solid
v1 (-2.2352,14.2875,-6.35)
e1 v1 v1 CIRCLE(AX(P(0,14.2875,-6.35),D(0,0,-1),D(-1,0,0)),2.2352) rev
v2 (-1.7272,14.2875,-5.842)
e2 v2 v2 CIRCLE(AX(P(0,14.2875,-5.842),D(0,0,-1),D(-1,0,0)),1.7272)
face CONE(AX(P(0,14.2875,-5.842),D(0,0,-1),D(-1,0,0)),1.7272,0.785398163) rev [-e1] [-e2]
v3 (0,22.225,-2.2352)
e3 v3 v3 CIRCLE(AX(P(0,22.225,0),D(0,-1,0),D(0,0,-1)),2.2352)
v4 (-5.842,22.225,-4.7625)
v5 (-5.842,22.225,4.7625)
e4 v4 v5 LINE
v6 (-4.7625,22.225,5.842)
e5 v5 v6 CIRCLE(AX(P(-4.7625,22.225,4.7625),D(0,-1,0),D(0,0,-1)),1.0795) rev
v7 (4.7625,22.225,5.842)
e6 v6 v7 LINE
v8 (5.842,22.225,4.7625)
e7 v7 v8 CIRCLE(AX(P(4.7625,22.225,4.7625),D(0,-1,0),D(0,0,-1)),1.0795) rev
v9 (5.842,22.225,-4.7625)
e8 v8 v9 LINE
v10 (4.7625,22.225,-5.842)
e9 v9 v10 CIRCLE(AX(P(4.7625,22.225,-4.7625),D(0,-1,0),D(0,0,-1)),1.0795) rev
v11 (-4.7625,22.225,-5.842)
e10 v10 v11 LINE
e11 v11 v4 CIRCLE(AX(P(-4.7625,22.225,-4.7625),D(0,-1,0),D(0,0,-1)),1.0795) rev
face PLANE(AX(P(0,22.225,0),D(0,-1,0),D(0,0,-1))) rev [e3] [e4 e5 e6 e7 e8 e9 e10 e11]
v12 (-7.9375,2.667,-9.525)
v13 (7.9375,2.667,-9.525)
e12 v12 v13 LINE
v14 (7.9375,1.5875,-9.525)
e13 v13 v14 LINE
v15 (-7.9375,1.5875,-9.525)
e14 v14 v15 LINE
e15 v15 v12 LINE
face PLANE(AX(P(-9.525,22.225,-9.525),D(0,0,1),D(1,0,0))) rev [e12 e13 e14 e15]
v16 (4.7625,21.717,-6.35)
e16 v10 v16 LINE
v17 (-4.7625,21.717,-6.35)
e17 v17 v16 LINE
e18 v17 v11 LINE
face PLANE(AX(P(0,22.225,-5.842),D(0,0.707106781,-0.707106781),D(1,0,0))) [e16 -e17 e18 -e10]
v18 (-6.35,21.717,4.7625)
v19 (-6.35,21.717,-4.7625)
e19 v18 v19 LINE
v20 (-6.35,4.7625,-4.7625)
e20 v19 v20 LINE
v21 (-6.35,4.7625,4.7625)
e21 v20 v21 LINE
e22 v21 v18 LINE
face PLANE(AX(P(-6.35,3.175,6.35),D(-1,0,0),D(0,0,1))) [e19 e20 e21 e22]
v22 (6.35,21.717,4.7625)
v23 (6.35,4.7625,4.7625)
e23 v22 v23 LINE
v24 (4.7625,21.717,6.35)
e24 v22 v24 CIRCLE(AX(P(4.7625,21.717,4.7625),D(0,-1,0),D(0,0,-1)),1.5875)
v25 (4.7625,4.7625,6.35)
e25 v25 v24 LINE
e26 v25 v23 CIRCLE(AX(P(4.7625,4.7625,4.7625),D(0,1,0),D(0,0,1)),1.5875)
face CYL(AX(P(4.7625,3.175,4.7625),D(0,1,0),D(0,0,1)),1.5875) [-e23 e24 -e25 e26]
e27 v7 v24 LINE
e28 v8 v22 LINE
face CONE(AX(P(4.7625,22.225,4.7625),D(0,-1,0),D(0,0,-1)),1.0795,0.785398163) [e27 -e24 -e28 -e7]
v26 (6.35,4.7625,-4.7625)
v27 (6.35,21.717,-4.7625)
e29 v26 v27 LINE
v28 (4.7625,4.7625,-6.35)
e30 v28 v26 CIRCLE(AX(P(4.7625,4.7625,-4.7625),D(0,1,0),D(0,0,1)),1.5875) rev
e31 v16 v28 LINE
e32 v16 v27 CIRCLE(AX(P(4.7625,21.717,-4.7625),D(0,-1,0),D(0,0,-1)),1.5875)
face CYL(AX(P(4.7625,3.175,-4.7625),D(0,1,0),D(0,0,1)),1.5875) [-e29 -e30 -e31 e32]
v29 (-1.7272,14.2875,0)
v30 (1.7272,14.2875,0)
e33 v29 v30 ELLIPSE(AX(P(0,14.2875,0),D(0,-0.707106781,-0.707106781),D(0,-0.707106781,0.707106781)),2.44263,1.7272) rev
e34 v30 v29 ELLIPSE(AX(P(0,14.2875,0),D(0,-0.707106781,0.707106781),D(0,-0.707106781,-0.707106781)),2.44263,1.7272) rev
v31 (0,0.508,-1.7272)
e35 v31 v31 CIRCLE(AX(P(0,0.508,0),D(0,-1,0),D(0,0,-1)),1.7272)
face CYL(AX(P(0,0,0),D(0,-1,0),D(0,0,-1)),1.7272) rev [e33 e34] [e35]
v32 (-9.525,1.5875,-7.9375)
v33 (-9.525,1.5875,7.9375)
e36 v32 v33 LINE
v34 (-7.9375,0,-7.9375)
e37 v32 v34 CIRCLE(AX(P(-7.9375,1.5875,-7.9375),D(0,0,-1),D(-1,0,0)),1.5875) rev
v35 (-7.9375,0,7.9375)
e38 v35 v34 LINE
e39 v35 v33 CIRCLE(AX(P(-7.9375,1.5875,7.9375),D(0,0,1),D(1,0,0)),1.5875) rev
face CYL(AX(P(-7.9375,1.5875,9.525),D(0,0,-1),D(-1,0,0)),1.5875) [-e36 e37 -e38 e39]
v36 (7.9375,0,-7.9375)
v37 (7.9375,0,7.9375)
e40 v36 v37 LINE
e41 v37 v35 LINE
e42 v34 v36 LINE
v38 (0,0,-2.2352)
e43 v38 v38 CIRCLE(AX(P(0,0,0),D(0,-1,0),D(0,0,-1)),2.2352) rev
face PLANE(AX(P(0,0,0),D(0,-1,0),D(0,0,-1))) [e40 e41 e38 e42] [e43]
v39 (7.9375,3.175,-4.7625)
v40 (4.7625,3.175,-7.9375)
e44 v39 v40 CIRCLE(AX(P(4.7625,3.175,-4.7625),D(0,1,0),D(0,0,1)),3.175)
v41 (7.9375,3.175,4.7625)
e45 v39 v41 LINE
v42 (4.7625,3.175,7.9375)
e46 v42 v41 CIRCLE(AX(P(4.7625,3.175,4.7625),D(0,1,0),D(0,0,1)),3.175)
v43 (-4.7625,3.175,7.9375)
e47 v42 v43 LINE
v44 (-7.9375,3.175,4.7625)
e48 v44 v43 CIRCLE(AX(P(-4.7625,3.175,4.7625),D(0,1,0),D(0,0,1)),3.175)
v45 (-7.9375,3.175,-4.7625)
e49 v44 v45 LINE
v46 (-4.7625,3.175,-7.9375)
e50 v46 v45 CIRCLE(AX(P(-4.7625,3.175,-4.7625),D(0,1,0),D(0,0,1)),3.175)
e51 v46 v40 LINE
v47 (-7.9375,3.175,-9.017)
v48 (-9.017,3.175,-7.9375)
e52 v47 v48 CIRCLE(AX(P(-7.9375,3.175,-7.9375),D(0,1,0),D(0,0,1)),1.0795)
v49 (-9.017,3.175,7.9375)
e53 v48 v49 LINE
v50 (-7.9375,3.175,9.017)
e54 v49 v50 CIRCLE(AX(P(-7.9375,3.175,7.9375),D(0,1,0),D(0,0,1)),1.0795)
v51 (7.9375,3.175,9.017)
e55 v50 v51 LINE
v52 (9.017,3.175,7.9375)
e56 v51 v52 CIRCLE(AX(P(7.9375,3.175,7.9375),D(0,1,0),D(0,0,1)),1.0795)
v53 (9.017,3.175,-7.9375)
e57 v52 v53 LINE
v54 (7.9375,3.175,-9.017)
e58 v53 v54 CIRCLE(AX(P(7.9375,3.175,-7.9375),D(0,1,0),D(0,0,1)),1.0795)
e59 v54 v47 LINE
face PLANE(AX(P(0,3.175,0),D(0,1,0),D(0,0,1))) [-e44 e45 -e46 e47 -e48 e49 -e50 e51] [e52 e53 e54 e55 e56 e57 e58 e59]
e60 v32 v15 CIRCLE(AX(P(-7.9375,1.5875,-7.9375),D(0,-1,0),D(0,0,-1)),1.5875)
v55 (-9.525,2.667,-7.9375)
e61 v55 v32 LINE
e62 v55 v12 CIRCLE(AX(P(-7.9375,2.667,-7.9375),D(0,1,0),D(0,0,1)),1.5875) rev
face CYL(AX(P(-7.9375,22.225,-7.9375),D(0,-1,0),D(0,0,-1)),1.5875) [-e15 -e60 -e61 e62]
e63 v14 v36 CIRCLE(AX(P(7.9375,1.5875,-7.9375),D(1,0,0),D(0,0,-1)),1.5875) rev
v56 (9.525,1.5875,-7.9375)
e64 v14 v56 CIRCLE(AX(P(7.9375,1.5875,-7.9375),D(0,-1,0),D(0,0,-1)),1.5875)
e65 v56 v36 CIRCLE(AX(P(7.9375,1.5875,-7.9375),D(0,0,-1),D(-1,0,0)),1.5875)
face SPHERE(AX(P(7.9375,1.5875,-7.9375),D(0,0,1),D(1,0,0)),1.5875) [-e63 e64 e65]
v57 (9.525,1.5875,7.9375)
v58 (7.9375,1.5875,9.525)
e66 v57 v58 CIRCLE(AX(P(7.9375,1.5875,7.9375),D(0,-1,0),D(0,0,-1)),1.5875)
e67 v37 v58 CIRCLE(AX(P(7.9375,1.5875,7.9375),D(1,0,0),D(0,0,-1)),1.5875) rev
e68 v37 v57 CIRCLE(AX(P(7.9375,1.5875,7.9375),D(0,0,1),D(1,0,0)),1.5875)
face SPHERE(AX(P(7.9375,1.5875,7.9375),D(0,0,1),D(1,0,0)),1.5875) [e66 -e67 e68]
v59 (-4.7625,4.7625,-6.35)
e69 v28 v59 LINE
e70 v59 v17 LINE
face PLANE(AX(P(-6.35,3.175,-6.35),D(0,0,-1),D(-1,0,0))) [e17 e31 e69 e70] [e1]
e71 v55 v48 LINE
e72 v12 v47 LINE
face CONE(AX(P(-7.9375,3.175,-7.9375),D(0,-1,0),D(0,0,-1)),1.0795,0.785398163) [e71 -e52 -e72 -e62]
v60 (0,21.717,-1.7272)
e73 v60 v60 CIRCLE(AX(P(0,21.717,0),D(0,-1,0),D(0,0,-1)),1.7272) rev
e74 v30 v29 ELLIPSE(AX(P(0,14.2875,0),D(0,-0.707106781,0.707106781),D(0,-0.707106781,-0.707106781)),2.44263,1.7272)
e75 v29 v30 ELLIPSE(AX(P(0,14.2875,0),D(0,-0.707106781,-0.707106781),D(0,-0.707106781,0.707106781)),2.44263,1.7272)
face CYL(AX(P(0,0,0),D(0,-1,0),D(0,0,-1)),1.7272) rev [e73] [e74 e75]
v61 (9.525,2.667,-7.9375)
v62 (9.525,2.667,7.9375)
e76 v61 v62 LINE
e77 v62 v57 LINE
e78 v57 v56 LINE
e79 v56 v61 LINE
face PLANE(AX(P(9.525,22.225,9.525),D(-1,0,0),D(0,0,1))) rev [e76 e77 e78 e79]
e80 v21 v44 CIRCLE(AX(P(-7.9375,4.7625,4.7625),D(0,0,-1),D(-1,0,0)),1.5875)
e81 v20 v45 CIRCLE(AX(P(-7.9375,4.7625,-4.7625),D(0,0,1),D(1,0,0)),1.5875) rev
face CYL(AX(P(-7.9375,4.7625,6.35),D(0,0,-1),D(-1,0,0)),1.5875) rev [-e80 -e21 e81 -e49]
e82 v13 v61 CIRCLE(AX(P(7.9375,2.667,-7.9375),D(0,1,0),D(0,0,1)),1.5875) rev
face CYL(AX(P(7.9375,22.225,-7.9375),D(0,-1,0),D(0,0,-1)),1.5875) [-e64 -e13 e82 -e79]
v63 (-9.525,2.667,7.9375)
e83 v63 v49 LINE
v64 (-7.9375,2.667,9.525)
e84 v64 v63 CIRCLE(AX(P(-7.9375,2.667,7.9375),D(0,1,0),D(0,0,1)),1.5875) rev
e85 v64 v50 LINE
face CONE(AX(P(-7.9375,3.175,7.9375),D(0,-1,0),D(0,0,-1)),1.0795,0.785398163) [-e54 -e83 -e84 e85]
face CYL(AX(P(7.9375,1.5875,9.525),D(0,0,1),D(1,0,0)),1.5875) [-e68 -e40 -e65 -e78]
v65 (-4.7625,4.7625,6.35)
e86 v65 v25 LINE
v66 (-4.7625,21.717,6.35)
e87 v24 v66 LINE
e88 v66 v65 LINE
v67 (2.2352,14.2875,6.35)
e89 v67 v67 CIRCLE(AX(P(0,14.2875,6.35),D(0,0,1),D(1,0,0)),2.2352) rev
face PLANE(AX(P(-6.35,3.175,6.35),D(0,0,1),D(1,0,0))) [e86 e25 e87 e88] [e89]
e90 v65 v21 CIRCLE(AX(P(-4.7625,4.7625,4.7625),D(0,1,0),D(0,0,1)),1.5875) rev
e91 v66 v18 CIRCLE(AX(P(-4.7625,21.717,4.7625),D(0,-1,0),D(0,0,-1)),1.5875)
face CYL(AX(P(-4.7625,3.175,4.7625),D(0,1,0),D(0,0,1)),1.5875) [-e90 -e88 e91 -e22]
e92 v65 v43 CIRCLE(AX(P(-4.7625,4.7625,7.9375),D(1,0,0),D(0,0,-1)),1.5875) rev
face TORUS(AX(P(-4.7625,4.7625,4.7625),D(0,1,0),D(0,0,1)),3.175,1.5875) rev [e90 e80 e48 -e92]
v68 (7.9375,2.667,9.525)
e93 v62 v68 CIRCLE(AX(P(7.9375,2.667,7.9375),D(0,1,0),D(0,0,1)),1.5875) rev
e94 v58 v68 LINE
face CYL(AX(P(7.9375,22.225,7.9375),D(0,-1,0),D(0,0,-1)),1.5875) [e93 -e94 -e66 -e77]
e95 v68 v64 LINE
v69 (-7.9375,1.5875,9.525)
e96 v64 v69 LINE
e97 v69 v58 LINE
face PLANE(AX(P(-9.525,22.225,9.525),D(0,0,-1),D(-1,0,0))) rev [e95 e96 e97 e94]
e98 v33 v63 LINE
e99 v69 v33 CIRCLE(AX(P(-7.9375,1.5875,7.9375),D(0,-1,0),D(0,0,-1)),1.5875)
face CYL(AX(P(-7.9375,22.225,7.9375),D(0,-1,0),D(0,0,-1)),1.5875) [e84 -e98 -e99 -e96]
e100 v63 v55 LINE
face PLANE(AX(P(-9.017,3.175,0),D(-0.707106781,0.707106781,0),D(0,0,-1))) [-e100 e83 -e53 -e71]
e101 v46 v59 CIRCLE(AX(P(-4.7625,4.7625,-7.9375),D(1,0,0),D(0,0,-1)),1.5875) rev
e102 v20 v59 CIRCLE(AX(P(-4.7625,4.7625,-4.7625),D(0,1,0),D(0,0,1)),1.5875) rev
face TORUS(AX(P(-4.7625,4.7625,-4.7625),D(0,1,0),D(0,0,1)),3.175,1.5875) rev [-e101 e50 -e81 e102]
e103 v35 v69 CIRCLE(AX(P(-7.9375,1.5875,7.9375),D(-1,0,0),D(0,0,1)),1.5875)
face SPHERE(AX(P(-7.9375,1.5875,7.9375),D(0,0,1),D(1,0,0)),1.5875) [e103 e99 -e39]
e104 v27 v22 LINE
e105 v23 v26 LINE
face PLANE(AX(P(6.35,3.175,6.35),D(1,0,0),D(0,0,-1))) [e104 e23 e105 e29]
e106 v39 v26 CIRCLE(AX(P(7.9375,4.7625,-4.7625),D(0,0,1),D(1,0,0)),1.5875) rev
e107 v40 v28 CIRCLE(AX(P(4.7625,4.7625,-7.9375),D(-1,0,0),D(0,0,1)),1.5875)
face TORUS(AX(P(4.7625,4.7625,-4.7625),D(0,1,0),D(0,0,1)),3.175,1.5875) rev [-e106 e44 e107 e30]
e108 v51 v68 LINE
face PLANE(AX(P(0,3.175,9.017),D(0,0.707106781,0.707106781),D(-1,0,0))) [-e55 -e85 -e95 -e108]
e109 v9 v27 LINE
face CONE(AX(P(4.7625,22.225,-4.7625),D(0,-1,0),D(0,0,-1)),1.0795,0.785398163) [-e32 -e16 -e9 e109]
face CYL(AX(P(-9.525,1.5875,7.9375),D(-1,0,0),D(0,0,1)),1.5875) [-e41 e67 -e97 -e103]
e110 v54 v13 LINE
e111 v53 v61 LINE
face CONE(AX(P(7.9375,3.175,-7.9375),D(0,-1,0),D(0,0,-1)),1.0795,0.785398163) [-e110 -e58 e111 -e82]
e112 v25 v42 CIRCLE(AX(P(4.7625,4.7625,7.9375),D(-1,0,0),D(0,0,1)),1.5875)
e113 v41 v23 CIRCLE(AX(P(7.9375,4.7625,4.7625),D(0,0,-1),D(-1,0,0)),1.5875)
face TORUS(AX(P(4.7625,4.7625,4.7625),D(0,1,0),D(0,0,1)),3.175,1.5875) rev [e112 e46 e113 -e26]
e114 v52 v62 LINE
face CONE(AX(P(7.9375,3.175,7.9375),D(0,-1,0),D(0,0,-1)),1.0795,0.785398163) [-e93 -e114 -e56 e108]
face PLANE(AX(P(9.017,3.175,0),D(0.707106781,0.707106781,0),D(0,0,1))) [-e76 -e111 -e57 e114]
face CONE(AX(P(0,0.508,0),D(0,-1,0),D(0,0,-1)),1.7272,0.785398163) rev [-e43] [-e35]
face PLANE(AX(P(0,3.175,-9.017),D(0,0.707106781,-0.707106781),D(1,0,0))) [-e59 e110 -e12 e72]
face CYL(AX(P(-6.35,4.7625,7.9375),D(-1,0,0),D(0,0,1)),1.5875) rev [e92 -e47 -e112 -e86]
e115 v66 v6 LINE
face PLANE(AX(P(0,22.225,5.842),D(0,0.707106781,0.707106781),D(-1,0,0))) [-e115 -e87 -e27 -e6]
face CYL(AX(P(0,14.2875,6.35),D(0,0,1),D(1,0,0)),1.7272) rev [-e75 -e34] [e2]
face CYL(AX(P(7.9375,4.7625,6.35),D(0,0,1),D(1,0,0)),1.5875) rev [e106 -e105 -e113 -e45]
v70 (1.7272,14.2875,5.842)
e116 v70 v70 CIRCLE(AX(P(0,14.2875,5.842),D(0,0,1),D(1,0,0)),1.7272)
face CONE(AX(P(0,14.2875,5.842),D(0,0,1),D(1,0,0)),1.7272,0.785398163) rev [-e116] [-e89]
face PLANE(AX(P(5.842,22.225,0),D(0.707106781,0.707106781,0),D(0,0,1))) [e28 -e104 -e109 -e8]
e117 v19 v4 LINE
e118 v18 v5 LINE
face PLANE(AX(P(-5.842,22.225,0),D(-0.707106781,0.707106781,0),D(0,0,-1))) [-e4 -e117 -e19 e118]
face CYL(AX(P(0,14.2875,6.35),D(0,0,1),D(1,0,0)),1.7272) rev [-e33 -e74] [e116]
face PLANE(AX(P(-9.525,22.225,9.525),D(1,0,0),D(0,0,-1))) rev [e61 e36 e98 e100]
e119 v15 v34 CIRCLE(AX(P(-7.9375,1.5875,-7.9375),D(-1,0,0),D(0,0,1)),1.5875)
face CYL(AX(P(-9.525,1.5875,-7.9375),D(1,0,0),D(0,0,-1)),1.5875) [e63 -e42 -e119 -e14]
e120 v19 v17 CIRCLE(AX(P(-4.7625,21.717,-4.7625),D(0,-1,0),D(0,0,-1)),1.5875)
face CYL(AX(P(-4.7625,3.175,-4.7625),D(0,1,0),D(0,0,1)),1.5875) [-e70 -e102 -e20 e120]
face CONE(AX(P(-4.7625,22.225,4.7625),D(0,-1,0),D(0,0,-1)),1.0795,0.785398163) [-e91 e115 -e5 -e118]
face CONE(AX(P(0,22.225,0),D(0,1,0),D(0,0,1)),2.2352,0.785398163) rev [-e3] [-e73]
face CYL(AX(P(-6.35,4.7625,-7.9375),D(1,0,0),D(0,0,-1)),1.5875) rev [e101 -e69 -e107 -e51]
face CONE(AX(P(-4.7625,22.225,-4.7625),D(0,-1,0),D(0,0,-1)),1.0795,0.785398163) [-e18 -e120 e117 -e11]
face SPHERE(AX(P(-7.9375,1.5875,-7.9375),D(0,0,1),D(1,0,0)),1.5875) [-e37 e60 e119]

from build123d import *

# Parameters (mm, degrees)
SKETCH1_W             = 19.05
SKETCH1_H             = 19.05
BOSS_EXTRUDE1_DEPTH   = 22.225
SKETCH2_OUTSIDE_W     = 28.034
SKETCH2_OUTSIDE_H     = 28.034
SKETCH2_OUTSIDE_W_2   = 12.7
SKETCH2_OUTSIDE_H_2   = 12.7
CUT_EXTRUDE1_DEPTH    = 19.05
F_8_32_TAPPED_HOLE2_D = 3.4544
F_8_32_TAPPED_HOLE1_D = 3.4544
FILLET1_R             = 1.5875
CHAMFER1_SIZE         = 0.508


with BuildPart() as part:
    # Sketch1 → Boss-Extrude1 (new body)
    with BuildSketch(Plane(origin=(0, 0, 0), x_dir=(1, 0, 0), z_dir=(0, 1, 0))):
        Rectangle(SKETCH1_W, SKETCH1_H)
    extrude(amount=BOSS_EXTRUDE1_DEPTH)

    # Sketch2 outside → Cut-Extrude1 (cut)
    with BuildSketch(Plane(origin=(0, 22.225, 0), x_dir=(1, 0, 0), z_dir=(0, 1, 0))):
        Rectangle(SKETCH2_OUTSIDE_W, SKETCH2_OUTSIDE_H)
        Rectangle(SKETCH2_OUTSIDE_W_2, SKETCH2_OUTSIDE_H_2, mode=Mode.SUBTRACT)
    extrude(amount=-CUT_EXTRUDE1_DEPTH, mode=Mode.SUBTRACT)

    # #8-32 Tapped Hole2 (through all)
    with Locations(Plane(origin=(0, 0, 0), x_dir=(-1, 0, 0), z_dir=(0, -1, 0))):
        with Locations((0, 0)):
            Hole(F_8_32_TAPPED_HOLE2_D / 2)

    # #8-32 Tapped Hole1 (through all)
    with Locations(Plane.XY.offset(6.35)):
        with Locations((0, 14.2875)):
            Hole(F_8_32_TAPPED_HOLE1_D / 2)

    # Fillet1
    fillet1_edges = [part.edges().sort_by_distance(p)[0] for p in [
        (9.525, 1.5875, 9.525),
        (-9.525, 1.5875, 9.525),
        (-9.525, 1.5875, -9.525),
        (9.525, 1.5875, -9.525),
        (0, 3.175, 6.35),
        (6.35, 3.175, 0),
        (0, 3.175, -6.35),
        (-6.35, 3.175, 0),
        (6.35, 12.7, 6.35),
        (-6.35, 12.7, 6.35),
        (-6.35, 12.7, -6.35),
        (6.35, 12.7, -6.35),
        (0, 0, 9.525),
        (-9.525, 0, 0),
        (0, 0, -9.525),
        (9.525, 0, 0),
    ]]
    fillet(fillet1_edges, radius=FILLET1_R - 0.0001)  # a hair under: the kernel refuses the full size

    # Chamfer1
    chamfer1_edges = [part.edges().sort_by_distance(p)[0] for p in [
        (-1.7272, 0, 0),
        (-1.7272, 22.225, 0),
        (1.7272, 14.2875, -6.35),
        (1.7272, 14.2875, 6.35),
        (0, 22.225, 6.35),
        (6.35, 22.225, 0),
        (0, 22.225, -6.35),
        (-6.35, 22.225, 0),
        (-5.885061304, 22.225, -5.885061304),
        (5.885061304, 22.225, -5.885061304),
        (-5.885061304, 22.225, 5.885061304),
        (5.885061304, 22.225, 5.885061304),
        (-9.525, 3.175, 0),
        (0, 3.175, 9.525),
        (9.525, 3.175, 0),
        (0, 3.175, -9.525),
        (9.060061304, 3.175, -9.060061304),
        (-9.060061304, 3.175, -9.060061304),
        (-9.060061304, 3.175, 9.060061304),
        (9.060061304, 3.175, 9.060061304),
    ]]
    chamfer(chamfer1_edges, length=CHAMFER1_SIZE)


solid = part.part
